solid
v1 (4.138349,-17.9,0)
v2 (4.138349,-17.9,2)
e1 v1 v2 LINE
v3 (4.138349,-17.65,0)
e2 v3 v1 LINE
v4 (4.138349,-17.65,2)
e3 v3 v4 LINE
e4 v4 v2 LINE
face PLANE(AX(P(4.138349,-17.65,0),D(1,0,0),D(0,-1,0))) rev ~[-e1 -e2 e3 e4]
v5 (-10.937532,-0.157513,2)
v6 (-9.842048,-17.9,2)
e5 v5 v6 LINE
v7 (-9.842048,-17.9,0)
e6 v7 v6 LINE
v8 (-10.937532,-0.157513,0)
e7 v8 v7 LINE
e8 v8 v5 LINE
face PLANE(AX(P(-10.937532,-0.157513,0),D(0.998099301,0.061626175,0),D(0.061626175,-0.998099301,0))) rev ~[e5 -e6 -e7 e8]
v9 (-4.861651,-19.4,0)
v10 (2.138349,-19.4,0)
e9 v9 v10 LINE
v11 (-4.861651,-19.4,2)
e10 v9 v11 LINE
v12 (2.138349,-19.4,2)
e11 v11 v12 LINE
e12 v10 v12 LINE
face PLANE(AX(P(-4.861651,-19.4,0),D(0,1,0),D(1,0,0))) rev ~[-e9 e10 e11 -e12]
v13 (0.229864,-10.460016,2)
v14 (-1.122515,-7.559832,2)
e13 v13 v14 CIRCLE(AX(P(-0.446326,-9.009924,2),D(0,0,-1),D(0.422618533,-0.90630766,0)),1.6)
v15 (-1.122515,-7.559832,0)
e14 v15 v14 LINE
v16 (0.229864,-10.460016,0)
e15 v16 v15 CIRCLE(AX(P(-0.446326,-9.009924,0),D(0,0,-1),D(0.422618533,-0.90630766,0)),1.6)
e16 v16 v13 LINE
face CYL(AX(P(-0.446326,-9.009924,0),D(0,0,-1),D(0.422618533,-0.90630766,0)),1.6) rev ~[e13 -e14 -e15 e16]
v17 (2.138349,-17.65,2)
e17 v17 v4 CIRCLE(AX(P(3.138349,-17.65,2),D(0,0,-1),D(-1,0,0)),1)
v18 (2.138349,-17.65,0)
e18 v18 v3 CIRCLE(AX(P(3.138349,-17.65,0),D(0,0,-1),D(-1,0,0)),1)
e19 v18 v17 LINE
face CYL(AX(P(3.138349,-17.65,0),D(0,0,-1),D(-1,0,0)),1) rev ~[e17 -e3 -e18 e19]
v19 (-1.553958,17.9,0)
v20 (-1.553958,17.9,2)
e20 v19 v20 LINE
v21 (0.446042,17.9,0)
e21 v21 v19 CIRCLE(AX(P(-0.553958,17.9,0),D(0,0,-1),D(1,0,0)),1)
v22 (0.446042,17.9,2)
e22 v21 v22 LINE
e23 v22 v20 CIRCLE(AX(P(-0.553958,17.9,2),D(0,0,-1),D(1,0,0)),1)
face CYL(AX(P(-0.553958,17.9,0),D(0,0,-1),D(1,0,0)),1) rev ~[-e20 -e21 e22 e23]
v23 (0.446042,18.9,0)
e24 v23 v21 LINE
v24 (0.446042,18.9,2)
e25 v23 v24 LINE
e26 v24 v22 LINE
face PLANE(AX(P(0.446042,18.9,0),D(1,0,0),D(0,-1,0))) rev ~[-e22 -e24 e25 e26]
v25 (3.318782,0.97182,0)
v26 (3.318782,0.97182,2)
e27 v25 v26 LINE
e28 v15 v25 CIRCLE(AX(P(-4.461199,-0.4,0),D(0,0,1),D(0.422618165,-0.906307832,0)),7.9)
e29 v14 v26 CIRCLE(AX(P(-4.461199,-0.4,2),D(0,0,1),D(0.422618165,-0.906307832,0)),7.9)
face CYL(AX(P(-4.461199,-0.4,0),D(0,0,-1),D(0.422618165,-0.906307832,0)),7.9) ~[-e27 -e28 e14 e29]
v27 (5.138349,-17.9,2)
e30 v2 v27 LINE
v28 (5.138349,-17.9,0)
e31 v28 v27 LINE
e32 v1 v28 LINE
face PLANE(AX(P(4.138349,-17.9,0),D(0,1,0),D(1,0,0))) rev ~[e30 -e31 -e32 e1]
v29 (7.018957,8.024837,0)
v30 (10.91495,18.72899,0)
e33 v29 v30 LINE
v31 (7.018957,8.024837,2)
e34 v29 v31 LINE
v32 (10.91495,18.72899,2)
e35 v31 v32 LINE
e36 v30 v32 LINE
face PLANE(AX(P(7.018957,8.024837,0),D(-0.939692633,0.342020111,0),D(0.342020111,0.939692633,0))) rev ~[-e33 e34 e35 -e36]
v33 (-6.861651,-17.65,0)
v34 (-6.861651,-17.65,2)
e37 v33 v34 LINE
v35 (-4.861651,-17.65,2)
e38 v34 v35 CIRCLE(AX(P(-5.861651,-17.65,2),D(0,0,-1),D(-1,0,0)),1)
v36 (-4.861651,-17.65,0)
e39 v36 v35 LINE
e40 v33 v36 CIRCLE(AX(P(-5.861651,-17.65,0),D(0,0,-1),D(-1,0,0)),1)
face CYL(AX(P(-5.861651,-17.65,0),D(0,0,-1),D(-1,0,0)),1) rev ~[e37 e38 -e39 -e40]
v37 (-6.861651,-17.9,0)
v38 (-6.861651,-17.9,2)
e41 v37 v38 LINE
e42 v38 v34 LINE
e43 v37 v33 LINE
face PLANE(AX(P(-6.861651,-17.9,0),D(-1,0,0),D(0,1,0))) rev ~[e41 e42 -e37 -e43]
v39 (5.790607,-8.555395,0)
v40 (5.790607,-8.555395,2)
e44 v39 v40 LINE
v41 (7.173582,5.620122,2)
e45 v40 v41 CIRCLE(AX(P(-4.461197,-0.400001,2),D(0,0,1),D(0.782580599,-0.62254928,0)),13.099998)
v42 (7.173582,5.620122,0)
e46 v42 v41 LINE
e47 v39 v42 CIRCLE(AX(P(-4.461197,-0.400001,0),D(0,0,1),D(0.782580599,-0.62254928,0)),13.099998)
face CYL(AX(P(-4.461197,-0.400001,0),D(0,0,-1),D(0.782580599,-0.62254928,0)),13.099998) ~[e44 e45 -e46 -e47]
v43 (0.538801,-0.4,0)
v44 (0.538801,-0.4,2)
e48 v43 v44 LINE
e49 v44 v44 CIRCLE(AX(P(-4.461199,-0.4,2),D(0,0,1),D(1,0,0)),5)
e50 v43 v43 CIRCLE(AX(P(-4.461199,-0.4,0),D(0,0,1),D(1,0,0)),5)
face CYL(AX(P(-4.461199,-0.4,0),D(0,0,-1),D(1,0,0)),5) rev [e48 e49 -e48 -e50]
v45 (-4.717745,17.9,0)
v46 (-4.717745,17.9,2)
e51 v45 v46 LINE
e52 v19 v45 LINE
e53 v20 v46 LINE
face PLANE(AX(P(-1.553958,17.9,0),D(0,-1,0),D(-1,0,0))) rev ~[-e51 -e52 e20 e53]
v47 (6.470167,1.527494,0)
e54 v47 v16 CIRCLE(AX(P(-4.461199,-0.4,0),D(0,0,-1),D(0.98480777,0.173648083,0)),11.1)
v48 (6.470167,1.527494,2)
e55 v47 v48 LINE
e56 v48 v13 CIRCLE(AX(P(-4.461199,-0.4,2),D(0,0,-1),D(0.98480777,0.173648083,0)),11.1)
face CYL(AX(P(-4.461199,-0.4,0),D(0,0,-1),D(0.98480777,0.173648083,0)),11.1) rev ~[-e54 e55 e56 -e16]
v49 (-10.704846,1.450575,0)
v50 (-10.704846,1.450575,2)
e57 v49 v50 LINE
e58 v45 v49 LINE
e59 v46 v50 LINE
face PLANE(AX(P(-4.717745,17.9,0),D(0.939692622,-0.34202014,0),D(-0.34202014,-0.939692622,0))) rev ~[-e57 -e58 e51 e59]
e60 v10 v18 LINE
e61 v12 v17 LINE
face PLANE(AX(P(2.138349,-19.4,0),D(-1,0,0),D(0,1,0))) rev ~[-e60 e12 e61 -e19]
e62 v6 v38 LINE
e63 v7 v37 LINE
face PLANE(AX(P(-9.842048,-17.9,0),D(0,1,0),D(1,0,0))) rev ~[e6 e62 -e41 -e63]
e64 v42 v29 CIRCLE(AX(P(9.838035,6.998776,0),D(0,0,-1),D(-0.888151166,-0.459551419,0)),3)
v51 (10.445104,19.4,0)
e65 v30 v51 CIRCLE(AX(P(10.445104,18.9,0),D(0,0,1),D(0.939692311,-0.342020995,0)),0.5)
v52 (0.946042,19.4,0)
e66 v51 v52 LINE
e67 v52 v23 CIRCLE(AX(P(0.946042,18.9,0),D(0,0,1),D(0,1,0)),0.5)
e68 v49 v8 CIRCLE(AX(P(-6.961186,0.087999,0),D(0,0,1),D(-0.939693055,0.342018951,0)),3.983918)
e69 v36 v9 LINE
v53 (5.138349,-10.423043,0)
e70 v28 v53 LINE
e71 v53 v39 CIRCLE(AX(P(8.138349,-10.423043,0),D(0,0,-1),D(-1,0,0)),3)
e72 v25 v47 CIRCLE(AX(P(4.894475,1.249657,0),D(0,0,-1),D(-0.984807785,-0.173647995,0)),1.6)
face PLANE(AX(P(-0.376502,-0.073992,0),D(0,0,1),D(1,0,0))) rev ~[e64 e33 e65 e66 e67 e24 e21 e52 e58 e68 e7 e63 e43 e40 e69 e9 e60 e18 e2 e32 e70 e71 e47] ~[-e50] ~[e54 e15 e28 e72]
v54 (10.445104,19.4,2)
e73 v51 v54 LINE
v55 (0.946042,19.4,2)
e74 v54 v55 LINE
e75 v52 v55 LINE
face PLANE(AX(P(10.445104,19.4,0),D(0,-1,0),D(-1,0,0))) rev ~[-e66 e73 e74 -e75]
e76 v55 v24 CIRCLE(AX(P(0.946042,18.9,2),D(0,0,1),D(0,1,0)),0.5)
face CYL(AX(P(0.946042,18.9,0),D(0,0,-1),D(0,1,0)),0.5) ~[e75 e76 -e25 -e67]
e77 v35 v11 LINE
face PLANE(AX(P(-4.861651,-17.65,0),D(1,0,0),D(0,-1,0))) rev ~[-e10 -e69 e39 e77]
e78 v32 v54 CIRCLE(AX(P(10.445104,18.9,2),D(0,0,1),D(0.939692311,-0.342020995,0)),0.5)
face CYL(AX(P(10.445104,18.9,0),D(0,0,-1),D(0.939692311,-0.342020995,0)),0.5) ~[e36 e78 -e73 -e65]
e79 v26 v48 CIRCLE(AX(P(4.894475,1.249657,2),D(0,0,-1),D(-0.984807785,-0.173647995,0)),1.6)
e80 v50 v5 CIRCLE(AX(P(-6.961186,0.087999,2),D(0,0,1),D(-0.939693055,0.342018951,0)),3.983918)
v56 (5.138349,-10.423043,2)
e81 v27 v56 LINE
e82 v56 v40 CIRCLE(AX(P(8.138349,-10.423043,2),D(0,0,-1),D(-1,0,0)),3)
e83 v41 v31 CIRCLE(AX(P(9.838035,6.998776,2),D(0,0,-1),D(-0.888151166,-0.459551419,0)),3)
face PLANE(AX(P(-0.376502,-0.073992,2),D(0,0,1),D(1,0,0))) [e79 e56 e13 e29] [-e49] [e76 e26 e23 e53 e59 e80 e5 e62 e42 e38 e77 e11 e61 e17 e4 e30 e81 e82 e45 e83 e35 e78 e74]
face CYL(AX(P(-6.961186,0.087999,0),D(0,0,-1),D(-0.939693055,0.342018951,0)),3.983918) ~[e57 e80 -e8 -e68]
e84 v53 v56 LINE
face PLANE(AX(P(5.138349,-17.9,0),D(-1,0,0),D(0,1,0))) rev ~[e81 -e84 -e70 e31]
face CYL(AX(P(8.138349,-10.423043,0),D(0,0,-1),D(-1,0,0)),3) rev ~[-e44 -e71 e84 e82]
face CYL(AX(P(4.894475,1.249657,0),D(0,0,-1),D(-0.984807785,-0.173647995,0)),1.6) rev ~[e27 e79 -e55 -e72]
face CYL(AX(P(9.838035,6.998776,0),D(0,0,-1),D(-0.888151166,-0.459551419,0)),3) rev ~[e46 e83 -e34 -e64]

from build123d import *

# Parameters (mm, degrees)
F0_R     = 5
F1_DEPTH = 2


# Not quite as in the source:
# - ends of sketch curves that miss each other by under 0.0002 mm in the source are joined


with BuildPart() as f1:
    # F0 (on Top) → F1 (new body)
    with BuildSketch(Plane.XY):
        with BuildLine():
            ThreePointArc((7.1735815028, 5.6201217427), (6.8442176511, 6.8062722819), (7.0189573047, 8.0248368891))
            Line((7.0189573047, 8.0248368891), (10.91495, 18.72899))
            ThreePointArc((10.91495, 18.72899), (10.8546800333, 19.1867882023), (10.445104, 19.4))
            Line((10.445104, 19.4), (0.946042, 19.4))
            ThreePointArc((0.946042, 19.4), (0.5924886094, 19.2535533906), (0.446042, 18.9))
            Line((0.446042, 18.9), (0.446042, 17.9))
            ThreePointArc((0.446042, 17.9), (-0.553958, 16.9), (-1.553958, 17.9))
            Line((-1.553958, 17.9), (-4.717745, 17.9))
            Line((-4.717745, 17.9), (-10.704846, 1.450575))
            ThreePointArc((-10.704846, 1.450575), (-10.9040414443, 0.6585195076), (-10.9375317857, -0.1575129868))
            Line((-10.9375317857, -0.1575129868), (-9.842048, -17.9))
            Line((-9.842048, -17.9), (-6.861651, -17.9))
            Line((-6.861651, -17.9), (-6.861651, -17.65))
            ThreePointArc((-6.861651, -17.65), (-5.861651, -16.65), (-4.861651, -17.65))
            Line((-4.861651, -17.65), (-4.861651, -19.4))
            Line((-4.861651, -19.4), (2.138349, -19.4))
            Line((2.138349, -19.4), (2.138349, -17.65))
            ThreePointArc((2.138349, -17.65), (3.138349, -16.65), (4.138349, -17.65))
            Line((4.138349, -17.65), (4.138349, -17.9))
            Line((4.138349, -17.9), (5.138349, -17.9))
            Line((5.138349, -17.9), (5.138349, -10.423043))
            ThreePointArc((5.138349, -10.423043), (5.3061038311, -9.4339083765), (5.7906072022, -8.5553951609))
            ThreePointArc((5.7906072022, -8.5553951609), (8.5768989173, -1.6720073498), (7.1735815028, 5.6201217427))
        make_face()
        with Locations((-4.461199, -0.4)):
            Circle(F0_R, mode=Mode.SUBTRACT)
        with BuildLine():
            ThreePointArc((0.2298636534, -10.4600162566), (-1.8964183588, -9.6861134342), (-1.122515215, -7.559831539))
            ThreePointArc((-1.122515215, -7.559831539), (2.5461863518, -4.0478144871), (3.3187823445, 0.9718200607))
            ThreePointArc((3.3187823445, 0.9718200607), (4.6166380137, 2.8253494221), (6.470167407, 1.5274940718))
            ThreePointArc((6.470167407, 1.5274940718), (5.3846210817, -5.5254099269), (0.2298636534, -10.4600162566))
        make_face(mode=Mode.SUBTRACT)
    extrude(amount=F1_DEPTH)


solid = f1.part
